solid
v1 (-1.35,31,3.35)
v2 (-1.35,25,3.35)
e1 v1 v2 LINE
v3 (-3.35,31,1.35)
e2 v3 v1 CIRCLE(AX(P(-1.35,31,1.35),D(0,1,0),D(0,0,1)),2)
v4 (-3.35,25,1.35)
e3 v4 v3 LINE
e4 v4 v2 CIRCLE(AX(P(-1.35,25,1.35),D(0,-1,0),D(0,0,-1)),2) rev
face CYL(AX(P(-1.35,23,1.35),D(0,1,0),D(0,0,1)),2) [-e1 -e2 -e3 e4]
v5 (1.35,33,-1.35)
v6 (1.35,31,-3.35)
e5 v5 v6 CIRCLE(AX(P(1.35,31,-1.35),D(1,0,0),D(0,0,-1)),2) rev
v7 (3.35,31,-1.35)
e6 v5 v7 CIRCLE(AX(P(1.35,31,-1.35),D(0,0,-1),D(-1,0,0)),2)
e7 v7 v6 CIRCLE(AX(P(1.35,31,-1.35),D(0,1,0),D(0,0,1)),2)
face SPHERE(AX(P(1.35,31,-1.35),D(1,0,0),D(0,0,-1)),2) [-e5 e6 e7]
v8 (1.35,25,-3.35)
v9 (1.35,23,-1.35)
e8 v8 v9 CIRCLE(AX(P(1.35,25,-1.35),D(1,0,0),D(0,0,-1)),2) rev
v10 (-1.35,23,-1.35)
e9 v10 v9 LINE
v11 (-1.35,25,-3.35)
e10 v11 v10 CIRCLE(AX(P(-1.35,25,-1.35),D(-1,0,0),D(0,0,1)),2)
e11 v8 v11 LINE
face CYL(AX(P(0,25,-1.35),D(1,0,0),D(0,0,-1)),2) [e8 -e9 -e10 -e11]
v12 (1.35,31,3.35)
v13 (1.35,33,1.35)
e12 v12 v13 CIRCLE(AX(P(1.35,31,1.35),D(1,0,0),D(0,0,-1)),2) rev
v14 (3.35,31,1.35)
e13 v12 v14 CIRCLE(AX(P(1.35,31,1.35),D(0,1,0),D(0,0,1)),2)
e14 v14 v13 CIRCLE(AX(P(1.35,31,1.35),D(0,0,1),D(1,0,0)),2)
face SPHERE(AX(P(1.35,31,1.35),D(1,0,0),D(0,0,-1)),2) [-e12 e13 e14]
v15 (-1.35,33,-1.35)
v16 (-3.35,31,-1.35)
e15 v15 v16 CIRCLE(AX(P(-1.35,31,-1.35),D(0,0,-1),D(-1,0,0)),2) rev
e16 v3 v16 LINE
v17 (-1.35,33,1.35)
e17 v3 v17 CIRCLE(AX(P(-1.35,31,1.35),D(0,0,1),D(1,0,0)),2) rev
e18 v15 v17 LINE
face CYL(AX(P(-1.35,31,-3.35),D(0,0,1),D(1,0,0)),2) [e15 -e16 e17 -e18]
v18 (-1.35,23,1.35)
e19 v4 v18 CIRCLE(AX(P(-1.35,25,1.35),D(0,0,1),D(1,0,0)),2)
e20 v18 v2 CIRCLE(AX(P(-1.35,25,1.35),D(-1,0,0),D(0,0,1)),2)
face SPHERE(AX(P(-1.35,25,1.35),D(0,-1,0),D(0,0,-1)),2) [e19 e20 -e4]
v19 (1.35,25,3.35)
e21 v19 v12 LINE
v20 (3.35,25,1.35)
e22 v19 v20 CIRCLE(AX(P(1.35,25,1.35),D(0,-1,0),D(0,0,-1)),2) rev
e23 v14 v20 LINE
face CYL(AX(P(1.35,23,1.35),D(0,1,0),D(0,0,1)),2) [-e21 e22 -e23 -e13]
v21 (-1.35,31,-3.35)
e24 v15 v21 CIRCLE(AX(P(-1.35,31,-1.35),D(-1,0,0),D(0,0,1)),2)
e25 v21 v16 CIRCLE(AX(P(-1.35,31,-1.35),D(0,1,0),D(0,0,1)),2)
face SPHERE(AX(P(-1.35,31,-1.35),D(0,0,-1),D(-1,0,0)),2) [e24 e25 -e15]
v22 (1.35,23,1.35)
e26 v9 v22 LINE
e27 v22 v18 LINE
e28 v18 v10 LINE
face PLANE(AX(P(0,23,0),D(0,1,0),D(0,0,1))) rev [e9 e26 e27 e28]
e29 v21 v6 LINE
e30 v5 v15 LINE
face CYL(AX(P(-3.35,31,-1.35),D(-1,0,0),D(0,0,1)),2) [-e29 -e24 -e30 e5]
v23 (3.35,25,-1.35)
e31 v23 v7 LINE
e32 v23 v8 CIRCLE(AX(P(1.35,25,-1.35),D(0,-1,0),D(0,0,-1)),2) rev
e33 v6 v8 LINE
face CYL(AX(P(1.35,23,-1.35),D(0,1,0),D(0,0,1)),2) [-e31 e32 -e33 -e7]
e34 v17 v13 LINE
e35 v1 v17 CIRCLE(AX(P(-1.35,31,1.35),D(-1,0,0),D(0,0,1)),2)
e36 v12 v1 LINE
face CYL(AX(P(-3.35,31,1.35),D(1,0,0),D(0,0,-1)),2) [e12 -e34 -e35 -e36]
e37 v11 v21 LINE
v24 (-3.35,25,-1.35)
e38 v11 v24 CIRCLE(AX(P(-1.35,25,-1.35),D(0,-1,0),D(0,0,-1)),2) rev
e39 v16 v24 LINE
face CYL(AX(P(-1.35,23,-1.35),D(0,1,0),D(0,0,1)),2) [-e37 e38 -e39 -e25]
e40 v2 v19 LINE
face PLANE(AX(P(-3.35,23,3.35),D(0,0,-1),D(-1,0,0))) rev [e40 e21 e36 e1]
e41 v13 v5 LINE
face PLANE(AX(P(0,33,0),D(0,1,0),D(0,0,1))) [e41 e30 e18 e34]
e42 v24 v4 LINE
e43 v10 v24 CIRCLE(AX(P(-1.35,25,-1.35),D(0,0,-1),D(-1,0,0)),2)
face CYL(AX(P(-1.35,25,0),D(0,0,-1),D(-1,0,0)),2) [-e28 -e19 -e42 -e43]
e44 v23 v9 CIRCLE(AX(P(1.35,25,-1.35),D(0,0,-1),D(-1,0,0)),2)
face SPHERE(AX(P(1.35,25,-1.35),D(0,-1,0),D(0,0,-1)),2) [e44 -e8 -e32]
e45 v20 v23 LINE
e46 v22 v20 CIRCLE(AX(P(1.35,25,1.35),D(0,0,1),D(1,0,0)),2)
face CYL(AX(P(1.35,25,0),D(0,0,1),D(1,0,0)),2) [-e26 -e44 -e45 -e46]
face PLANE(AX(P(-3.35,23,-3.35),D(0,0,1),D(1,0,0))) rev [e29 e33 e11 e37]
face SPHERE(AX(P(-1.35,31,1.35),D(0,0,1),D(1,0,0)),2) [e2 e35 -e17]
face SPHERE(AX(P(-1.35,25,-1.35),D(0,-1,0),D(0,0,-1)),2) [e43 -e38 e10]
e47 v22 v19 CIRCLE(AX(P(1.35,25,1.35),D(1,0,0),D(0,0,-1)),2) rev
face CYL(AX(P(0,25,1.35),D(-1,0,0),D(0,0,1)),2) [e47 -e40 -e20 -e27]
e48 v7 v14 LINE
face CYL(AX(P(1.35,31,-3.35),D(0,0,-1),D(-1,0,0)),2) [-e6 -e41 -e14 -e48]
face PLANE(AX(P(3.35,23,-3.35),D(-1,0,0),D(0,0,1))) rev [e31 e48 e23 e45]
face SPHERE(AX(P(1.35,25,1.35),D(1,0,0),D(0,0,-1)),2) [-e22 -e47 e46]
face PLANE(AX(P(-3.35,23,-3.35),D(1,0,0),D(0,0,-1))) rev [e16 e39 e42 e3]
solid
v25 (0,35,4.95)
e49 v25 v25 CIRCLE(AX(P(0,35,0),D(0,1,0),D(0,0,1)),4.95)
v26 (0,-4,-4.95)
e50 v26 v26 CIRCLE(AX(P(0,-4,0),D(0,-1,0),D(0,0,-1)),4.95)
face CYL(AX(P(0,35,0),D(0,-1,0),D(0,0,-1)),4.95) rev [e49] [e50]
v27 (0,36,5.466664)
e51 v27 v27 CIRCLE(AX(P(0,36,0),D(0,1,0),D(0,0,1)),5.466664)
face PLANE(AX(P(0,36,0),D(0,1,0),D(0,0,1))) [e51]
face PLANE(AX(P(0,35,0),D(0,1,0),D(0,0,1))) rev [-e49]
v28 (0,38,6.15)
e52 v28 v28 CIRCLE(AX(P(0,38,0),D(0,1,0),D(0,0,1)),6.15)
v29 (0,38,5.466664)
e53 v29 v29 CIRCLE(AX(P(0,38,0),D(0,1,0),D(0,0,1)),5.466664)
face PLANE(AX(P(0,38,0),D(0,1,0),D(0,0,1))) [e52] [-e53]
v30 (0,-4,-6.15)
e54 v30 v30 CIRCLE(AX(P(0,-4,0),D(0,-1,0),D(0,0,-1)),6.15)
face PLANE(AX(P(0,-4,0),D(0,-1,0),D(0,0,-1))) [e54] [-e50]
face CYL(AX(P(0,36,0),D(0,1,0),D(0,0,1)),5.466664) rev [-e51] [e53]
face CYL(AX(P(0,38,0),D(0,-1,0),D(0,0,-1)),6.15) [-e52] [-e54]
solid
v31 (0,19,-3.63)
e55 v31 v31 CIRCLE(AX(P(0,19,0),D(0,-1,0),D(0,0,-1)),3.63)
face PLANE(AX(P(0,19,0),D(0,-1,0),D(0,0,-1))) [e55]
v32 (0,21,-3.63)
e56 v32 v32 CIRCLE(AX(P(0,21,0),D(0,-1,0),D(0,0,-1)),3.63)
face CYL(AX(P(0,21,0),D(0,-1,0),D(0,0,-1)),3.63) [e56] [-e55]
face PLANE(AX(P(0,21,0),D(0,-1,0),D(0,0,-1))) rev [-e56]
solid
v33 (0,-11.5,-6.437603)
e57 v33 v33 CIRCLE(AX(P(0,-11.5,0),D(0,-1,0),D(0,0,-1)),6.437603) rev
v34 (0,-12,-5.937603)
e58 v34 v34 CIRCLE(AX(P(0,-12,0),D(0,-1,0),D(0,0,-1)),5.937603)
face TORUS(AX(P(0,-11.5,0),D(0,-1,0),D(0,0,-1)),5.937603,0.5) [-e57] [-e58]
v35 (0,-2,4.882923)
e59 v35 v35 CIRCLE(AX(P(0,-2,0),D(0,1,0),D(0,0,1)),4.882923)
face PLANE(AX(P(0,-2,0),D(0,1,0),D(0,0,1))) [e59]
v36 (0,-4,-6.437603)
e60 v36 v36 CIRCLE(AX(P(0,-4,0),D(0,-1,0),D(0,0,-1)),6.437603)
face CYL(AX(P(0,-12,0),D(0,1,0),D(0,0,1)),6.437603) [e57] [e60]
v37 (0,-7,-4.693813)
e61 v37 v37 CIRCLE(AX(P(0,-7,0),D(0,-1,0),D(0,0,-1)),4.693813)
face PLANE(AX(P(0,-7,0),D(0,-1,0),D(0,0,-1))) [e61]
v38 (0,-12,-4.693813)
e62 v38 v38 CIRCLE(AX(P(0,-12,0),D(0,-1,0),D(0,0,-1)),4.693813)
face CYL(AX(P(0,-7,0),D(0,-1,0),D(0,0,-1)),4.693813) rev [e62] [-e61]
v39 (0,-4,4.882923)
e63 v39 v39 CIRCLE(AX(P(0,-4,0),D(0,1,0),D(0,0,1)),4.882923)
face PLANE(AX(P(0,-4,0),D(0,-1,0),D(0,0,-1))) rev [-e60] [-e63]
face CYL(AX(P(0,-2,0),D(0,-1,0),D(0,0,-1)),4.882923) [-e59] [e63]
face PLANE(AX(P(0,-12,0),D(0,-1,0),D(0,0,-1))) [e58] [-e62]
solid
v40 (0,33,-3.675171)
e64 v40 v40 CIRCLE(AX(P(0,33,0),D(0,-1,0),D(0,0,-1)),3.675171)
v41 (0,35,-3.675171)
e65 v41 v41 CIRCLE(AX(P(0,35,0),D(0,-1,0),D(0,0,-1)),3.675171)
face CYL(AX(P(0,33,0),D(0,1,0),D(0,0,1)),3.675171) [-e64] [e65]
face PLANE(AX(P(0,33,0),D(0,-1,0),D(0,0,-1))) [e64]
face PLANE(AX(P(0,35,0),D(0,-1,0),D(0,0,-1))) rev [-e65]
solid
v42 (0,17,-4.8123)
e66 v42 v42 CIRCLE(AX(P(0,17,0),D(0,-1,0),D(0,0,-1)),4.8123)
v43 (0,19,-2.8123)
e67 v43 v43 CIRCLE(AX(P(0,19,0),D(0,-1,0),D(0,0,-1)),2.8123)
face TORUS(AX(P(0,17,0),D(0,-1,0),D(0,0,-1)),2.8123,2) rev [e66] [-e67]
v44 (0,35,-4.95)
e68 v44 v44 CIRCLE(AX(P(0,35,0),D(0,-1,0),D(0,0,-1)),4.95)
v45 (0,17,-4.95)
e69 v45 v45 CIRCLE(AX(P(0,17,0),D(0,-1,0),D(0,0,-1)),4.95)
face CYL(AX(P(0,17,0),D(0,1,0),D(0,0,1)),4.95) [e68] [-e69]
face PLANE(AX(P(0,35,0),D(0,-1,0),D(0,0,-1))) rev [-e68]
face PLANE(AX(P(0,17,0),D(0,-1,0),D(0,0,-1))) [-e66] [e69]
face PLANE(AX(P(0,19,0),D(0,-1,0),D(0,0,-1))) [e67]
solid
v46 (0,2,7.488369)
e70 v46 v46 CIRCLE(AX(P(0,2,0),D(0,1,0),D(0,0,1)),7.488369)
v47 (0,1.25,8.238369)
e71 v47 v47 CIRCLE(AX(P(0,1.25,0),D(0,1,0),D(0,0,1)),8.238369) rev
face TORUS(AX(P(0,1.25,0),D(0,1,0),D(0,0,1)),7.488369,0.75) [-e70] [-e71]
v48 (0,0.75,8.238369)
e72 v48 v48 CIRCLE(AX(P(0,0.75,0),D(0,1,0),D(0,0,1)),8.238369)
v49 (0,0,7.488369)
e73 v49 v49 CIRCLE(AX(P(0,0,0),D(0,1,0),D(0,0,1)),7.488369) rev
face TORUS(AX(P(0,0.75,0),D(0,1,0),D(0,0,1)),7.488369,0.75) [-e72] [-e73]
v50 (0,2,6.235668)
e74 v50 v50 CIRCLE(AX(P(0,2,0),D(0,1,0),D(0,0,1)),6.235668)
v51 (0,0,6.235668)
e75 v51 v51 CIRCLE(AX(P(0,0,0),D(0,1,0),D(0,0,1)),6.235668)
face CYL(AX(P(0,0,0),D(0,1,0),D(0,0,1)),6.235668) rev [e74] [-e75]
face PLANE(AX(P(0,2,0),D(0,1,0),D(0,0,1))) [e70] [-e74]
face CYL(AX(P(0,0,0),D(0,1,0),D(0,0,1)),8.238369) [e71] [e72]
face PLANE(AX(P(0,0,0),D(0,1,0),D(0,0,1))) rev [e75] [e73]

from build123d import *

# Parameters (mm, degrees)
SKETCH1_R                  = 6.15
BOSS_EXTRUDE1_DEPTH        = 38
SKETCH4_R                  = 4.95
CUT_EXTRUDE2_DEPTH         = 35
SKETCH7_R                  = 8.271925693
SKETCH7_R_2                = 6.15
BOSS_EXTRUDE3_DEPTH        = 2.1
FILLET2_R                  = 1
SKETCH8_R                  = 5.466664299
CUT_EXTRUDE3_DEPTH         = 2
BOSS_EXTRUDE4_START        = 4
SKETCH9_R                  = 6.15
SKETCH9_R_2                = 4.95
BOSS_EXTRUDE4_DEPTH        = 4
SKETCH10_R                 = 4.95
BOSS_EXTRUDE5_DEPTH        = 18
SKETCH12_R                 = 3.675171346
BOSS_EXTRUDE6_DEPTH        = 2
SKETCH11_R                 = 4.812300359
CUT_EXTRUDE5_DEPTH         = 2
SKETCH13_R                 = 3.63
BOSS_EXTRUDE7_DEPTH        = 2
SKETCH15_W                 = 6.7
SKETCH15_H                 = 6.7
BOSS_EXTRUDE8_DEPTH        = 10
FILLET3_R                  = 2
SKETCH16_R                 = 6.437602848
BOSS_EXTRUDE9_DEPTH        = 8
FILLET4_R                  = 2
CUT_EXTRUDE6_START         = -2.2
SKETCH20_R                 = 8.783510696
SKETCH20_R_2               = 6.15
CUT_EXTRUDE6_DEPTH         = 2.2
BOSS_EXTRUDE12_OUTLINE_R   = 8.238368975
BOSS_EXTRUDE12_OUTLINE_R_2 = 6.235668254
BOSS_EXTRUDE12_DEPTH       = 2
FILLET5_R                  = 0.75
SKETCH21_R                 = 4.693813241
CUT_EXTRUDE7_DEPTH         = 5
SKETCH24_R                 = 4.882922789
BOSS_EXTRUDE13_DEPTH       = 2
FILLET6_R                  = 0.5


# Read off the part's stored shape, not the designer's step: Boss-Extrude12
with BuildPart() as part:
    # Sketch1 → Boss-Extrude1 (new body)
    with BuildSketch(Plane(origin=(0, 0, 0), x_dir=(1, 0, 0), z_dir=(0, 1, 0))):
        with Locations(Location((0, 0, 0), (0, 0, 270))):
            Circle(SKETCH1_R)
    extrude(amount=BOSS_EXTRUDE1_DEPTH)

    # Sketch4 → Cut-Extrude2 (cut)
    with BuildSketch(Plane(origin=(0, 0, 0), x_dir=(1, 0, 0), z_dir=(0, 1, 0))):
        with Locations(Location((0, 0, 0), (0, 0, 270))):
            Circle(SKETCH4_R)
    extrude(amount=CUT_EXTRUDE2_DEPTH, mode=Mode.SUBTRACT)

    # Sketch7 → Boss-Extrude3 (add)
    with BuildSketch(Plane(origin=(0, 0, 0), x_dir=(1, 0, 0), z_dir=(0, 1, 0))):
        with Locations(Location((0, 0, 0), (0, 0, 270))):
            Circle(SKETCH7_R)
        with Locations(Location((0, 0, 0), (0, 0, 270))):
            Circle(SKETCH7_R_2, mode=Mode.SUBTRACT)
    extrude(amount=BOSS_EXTRUDE3_DEPTH)

    # Fillet2
    fillet2_edges = [part.edges().sort_by_distance(p)[0] for p in [
        (0, 2.1, -8.271925693),
        (0, 0, -8.271925693),
    ]]
    fillet(fillet2_edges, radius=FILLET2_R)

    # Sketch8 → Cut-Extrude3 (cut)
    with BuildSketch(Plane(origin=(0, 38, 0), x_dir=(1, 0, 0), z_dir=(0, 1, 0))):
        with Locations(Location((0, 0, 0), (0, 0, 270))):
            Circle(SKETCH8_R)
    extrude(amount=-CUT_EXTRUDE3_DEPTH, mode=Mode.SUBTRACT)

    # Sketch9 → Boss-Extrude4 (add)
    with BuildSketch(Plane.XZ.offset(BOSS_EXTRUDE4_START)):
        with Locations(Location((0, 0, 0), (0, 0, 90))):
            Circle(SKETCH9_R)
        with Locations(Location((0, 0, 0), (0, 0, 270))):
            Circle(SKETCH9_R_2, mode=Mode.SUBTRACT)
    extrude(amount=-BOSS_EXTRUDE4_DEPTH)

    # Sketch20 → Cut-Extrude6 (cut)
    with BuildSketch(Plane(origin=(0, 2.1, 0), x_dir=(1, 0, 0), z_dir=(0, 1, 0)).offset(CUT_EXTRUDE6_START)):
        Circle(SKETCH20_R)
        with Locations(Location((0, 0, 0), (0, 0, 90))):
            Circle(SKETCH20_R_2, mode=Mode.SUBTRACT)
    extrude(amount=CUT_EXTRUDE6_DEPTH, mode=Mode.SUBTRACT)


with BuildPart() as body_2:
    # Sketch10 → Boss-Extrude5 (new body)
    with BuildSketch(Plane.XZ.offset(-35)):
        with Locations(Location((0, 0, 0), (0, 0, 270))):
            Circle(SKETCH10_R)
    extrude(amount=BOSS_EXTRUDE5_DEPTH)

    # Sketch11 → Cut-Extrude5 (cut)
    with BuildSketch(Plane.XZ.offset(-17)):
        with Locations(Location((0, 0, 0), (0, 0, 270))):
            Circle(SKETCH11_R)
    extrude(amount=-CUT_EXTRUDE5_DEPTH, mode=Mode.SUBTRACT)

    # Fillet4
    fillet4_edges = [body_2.edges().sort_by_distance(p)[0] for p in [
        (0, 19, 4.812300359),
    ]]
    fillet(fillet4_edges, radius=FILLET4_R - 0.0001)  # a hair under: the kernel refuses the full size


with BuildPart() as body_3:
    # Sketch12 → Boss-Extrude6 (new body)
    with BuildSketch(Plane.XZ.offset(-35)):
        with Locations(Location((0, 0, 0), (0, 0, 270))):
            Circle(SKETCH12_R)
    extrude(amount=BOSS_EXTRUDE6_DEPTH)


with BuildPart() as body_4:
    # Sketch13 → Boss-Extrude7 (new body)
    with BuildSketch(Plane.XZ.offset(-19)):
        with Locations(Location((0, 0, 0), (0, 0, 270))):
            Circle(SKETCH13_R)
    extrude(amount=-BOSS_EXTRUDE7_DEPTH)


with BuildPart() as body_5:
    # Sketch15 → Boss-Extrude8 (new body)
    with BuildSketch(Plane.XZ.offset(-33)):
        Rectangle(SKETCH15_W, SKETCH15_H)
    extrude(amount=BOSS_EXTRUDE8_DEPTH)

    # Fillet3
    fillet3_edges = [body_5.edges().sort_by_distance(p)[0] for p in [
        (-3.35, 23, 0),
        (0, 23, -3.35),
        (3.35, 23, 0),
        (0, 33, -3.35),
        (-3.35, 33, 0),
        (0, 33, 3.35),
        (3.35, 33, 0),
        (3.35, 28, -3.35),
        (-3.35, 28, -3.35),
        (-3.35, 28, 3.35),
        (3.35, 28, 3.35),
        (0, 23, 3.35),
    ]]
    fillet(fillet3_edges, radius=FILLET3_R)


with BuildPart() as body_6:
    # Sketch16 → Boss-Extrude9 (new body)
    with BuildSketch(Plane.XZ.offset(4)):
        with Locations(Location((0, 0, 0), (0, 0, 270))):
            Circle(SKETCH16_R)
    extrude(amount=BOSS_EXTRUDE9_DEPTH)

    # Sketch21 → Cut-Extrude7 (cut)
    with BuildSketch(Plane.XZ.offset(12)):
        with Locations(Location((0, 0, 0), (0, 0, 270))):
            Circle(SKETCH21_R)
    extrude(amount=-CUT_EXTRUDE7_DEPTH, mode=Mode.SUBTRACT)

    # Sketch24 → Boss-Extrude13 (add)
    with BuildSketch(Plane(origin=(0, -4, 0), x_dir=(1, 0, 0), z_dir=(0, 1, 0))):
        with Locations(Location((0, 0, 0), (0, 0, 270))):
            Circle(SKETCH24_R)
    extrude(amount=BOSS_EXTRUDE13_DEPTH)

    # Fillet6
    fillet6_edges = [body_6.edges().sort_by_distance(p)[0] for p in [
        (0, -12, 6.437602848),
    ]]
    fillet(fillet6_edges, radius=FILLET6_R)


with BuildPart() as body_7:
    # Boss-Extrude12 outline → Boss-Extrude12 (new body)
    with BuildSketch(Plane(origin=(0, 0, 0), x_dir=(1, 0, 0), z_dir=(0, 1, 0))):
        Circle(BOSS_EXTRUDE12_OUTLINE_R)
        Circle(BOSS_EXTRUDE12_OUTLINE_R_2, mode=Mode.SUBTRACT)
    extrude(amount=BOSS_EXTRUDE12_DEPTH)

    # Fillet5
    fillet5_edges = [body_7.edges().sort_by_distance(p)[0] for p in [
        (-8.238368975, 2, 0),
        (-8.238368975, 0, 0),
    ]]
    fillet(fillet5_edges, radius=FILLET5_R)


solid = Compound([part.part, body_2.part, body_3.part, body_4.part, body_5.part, body_6.part, body_7.part])
